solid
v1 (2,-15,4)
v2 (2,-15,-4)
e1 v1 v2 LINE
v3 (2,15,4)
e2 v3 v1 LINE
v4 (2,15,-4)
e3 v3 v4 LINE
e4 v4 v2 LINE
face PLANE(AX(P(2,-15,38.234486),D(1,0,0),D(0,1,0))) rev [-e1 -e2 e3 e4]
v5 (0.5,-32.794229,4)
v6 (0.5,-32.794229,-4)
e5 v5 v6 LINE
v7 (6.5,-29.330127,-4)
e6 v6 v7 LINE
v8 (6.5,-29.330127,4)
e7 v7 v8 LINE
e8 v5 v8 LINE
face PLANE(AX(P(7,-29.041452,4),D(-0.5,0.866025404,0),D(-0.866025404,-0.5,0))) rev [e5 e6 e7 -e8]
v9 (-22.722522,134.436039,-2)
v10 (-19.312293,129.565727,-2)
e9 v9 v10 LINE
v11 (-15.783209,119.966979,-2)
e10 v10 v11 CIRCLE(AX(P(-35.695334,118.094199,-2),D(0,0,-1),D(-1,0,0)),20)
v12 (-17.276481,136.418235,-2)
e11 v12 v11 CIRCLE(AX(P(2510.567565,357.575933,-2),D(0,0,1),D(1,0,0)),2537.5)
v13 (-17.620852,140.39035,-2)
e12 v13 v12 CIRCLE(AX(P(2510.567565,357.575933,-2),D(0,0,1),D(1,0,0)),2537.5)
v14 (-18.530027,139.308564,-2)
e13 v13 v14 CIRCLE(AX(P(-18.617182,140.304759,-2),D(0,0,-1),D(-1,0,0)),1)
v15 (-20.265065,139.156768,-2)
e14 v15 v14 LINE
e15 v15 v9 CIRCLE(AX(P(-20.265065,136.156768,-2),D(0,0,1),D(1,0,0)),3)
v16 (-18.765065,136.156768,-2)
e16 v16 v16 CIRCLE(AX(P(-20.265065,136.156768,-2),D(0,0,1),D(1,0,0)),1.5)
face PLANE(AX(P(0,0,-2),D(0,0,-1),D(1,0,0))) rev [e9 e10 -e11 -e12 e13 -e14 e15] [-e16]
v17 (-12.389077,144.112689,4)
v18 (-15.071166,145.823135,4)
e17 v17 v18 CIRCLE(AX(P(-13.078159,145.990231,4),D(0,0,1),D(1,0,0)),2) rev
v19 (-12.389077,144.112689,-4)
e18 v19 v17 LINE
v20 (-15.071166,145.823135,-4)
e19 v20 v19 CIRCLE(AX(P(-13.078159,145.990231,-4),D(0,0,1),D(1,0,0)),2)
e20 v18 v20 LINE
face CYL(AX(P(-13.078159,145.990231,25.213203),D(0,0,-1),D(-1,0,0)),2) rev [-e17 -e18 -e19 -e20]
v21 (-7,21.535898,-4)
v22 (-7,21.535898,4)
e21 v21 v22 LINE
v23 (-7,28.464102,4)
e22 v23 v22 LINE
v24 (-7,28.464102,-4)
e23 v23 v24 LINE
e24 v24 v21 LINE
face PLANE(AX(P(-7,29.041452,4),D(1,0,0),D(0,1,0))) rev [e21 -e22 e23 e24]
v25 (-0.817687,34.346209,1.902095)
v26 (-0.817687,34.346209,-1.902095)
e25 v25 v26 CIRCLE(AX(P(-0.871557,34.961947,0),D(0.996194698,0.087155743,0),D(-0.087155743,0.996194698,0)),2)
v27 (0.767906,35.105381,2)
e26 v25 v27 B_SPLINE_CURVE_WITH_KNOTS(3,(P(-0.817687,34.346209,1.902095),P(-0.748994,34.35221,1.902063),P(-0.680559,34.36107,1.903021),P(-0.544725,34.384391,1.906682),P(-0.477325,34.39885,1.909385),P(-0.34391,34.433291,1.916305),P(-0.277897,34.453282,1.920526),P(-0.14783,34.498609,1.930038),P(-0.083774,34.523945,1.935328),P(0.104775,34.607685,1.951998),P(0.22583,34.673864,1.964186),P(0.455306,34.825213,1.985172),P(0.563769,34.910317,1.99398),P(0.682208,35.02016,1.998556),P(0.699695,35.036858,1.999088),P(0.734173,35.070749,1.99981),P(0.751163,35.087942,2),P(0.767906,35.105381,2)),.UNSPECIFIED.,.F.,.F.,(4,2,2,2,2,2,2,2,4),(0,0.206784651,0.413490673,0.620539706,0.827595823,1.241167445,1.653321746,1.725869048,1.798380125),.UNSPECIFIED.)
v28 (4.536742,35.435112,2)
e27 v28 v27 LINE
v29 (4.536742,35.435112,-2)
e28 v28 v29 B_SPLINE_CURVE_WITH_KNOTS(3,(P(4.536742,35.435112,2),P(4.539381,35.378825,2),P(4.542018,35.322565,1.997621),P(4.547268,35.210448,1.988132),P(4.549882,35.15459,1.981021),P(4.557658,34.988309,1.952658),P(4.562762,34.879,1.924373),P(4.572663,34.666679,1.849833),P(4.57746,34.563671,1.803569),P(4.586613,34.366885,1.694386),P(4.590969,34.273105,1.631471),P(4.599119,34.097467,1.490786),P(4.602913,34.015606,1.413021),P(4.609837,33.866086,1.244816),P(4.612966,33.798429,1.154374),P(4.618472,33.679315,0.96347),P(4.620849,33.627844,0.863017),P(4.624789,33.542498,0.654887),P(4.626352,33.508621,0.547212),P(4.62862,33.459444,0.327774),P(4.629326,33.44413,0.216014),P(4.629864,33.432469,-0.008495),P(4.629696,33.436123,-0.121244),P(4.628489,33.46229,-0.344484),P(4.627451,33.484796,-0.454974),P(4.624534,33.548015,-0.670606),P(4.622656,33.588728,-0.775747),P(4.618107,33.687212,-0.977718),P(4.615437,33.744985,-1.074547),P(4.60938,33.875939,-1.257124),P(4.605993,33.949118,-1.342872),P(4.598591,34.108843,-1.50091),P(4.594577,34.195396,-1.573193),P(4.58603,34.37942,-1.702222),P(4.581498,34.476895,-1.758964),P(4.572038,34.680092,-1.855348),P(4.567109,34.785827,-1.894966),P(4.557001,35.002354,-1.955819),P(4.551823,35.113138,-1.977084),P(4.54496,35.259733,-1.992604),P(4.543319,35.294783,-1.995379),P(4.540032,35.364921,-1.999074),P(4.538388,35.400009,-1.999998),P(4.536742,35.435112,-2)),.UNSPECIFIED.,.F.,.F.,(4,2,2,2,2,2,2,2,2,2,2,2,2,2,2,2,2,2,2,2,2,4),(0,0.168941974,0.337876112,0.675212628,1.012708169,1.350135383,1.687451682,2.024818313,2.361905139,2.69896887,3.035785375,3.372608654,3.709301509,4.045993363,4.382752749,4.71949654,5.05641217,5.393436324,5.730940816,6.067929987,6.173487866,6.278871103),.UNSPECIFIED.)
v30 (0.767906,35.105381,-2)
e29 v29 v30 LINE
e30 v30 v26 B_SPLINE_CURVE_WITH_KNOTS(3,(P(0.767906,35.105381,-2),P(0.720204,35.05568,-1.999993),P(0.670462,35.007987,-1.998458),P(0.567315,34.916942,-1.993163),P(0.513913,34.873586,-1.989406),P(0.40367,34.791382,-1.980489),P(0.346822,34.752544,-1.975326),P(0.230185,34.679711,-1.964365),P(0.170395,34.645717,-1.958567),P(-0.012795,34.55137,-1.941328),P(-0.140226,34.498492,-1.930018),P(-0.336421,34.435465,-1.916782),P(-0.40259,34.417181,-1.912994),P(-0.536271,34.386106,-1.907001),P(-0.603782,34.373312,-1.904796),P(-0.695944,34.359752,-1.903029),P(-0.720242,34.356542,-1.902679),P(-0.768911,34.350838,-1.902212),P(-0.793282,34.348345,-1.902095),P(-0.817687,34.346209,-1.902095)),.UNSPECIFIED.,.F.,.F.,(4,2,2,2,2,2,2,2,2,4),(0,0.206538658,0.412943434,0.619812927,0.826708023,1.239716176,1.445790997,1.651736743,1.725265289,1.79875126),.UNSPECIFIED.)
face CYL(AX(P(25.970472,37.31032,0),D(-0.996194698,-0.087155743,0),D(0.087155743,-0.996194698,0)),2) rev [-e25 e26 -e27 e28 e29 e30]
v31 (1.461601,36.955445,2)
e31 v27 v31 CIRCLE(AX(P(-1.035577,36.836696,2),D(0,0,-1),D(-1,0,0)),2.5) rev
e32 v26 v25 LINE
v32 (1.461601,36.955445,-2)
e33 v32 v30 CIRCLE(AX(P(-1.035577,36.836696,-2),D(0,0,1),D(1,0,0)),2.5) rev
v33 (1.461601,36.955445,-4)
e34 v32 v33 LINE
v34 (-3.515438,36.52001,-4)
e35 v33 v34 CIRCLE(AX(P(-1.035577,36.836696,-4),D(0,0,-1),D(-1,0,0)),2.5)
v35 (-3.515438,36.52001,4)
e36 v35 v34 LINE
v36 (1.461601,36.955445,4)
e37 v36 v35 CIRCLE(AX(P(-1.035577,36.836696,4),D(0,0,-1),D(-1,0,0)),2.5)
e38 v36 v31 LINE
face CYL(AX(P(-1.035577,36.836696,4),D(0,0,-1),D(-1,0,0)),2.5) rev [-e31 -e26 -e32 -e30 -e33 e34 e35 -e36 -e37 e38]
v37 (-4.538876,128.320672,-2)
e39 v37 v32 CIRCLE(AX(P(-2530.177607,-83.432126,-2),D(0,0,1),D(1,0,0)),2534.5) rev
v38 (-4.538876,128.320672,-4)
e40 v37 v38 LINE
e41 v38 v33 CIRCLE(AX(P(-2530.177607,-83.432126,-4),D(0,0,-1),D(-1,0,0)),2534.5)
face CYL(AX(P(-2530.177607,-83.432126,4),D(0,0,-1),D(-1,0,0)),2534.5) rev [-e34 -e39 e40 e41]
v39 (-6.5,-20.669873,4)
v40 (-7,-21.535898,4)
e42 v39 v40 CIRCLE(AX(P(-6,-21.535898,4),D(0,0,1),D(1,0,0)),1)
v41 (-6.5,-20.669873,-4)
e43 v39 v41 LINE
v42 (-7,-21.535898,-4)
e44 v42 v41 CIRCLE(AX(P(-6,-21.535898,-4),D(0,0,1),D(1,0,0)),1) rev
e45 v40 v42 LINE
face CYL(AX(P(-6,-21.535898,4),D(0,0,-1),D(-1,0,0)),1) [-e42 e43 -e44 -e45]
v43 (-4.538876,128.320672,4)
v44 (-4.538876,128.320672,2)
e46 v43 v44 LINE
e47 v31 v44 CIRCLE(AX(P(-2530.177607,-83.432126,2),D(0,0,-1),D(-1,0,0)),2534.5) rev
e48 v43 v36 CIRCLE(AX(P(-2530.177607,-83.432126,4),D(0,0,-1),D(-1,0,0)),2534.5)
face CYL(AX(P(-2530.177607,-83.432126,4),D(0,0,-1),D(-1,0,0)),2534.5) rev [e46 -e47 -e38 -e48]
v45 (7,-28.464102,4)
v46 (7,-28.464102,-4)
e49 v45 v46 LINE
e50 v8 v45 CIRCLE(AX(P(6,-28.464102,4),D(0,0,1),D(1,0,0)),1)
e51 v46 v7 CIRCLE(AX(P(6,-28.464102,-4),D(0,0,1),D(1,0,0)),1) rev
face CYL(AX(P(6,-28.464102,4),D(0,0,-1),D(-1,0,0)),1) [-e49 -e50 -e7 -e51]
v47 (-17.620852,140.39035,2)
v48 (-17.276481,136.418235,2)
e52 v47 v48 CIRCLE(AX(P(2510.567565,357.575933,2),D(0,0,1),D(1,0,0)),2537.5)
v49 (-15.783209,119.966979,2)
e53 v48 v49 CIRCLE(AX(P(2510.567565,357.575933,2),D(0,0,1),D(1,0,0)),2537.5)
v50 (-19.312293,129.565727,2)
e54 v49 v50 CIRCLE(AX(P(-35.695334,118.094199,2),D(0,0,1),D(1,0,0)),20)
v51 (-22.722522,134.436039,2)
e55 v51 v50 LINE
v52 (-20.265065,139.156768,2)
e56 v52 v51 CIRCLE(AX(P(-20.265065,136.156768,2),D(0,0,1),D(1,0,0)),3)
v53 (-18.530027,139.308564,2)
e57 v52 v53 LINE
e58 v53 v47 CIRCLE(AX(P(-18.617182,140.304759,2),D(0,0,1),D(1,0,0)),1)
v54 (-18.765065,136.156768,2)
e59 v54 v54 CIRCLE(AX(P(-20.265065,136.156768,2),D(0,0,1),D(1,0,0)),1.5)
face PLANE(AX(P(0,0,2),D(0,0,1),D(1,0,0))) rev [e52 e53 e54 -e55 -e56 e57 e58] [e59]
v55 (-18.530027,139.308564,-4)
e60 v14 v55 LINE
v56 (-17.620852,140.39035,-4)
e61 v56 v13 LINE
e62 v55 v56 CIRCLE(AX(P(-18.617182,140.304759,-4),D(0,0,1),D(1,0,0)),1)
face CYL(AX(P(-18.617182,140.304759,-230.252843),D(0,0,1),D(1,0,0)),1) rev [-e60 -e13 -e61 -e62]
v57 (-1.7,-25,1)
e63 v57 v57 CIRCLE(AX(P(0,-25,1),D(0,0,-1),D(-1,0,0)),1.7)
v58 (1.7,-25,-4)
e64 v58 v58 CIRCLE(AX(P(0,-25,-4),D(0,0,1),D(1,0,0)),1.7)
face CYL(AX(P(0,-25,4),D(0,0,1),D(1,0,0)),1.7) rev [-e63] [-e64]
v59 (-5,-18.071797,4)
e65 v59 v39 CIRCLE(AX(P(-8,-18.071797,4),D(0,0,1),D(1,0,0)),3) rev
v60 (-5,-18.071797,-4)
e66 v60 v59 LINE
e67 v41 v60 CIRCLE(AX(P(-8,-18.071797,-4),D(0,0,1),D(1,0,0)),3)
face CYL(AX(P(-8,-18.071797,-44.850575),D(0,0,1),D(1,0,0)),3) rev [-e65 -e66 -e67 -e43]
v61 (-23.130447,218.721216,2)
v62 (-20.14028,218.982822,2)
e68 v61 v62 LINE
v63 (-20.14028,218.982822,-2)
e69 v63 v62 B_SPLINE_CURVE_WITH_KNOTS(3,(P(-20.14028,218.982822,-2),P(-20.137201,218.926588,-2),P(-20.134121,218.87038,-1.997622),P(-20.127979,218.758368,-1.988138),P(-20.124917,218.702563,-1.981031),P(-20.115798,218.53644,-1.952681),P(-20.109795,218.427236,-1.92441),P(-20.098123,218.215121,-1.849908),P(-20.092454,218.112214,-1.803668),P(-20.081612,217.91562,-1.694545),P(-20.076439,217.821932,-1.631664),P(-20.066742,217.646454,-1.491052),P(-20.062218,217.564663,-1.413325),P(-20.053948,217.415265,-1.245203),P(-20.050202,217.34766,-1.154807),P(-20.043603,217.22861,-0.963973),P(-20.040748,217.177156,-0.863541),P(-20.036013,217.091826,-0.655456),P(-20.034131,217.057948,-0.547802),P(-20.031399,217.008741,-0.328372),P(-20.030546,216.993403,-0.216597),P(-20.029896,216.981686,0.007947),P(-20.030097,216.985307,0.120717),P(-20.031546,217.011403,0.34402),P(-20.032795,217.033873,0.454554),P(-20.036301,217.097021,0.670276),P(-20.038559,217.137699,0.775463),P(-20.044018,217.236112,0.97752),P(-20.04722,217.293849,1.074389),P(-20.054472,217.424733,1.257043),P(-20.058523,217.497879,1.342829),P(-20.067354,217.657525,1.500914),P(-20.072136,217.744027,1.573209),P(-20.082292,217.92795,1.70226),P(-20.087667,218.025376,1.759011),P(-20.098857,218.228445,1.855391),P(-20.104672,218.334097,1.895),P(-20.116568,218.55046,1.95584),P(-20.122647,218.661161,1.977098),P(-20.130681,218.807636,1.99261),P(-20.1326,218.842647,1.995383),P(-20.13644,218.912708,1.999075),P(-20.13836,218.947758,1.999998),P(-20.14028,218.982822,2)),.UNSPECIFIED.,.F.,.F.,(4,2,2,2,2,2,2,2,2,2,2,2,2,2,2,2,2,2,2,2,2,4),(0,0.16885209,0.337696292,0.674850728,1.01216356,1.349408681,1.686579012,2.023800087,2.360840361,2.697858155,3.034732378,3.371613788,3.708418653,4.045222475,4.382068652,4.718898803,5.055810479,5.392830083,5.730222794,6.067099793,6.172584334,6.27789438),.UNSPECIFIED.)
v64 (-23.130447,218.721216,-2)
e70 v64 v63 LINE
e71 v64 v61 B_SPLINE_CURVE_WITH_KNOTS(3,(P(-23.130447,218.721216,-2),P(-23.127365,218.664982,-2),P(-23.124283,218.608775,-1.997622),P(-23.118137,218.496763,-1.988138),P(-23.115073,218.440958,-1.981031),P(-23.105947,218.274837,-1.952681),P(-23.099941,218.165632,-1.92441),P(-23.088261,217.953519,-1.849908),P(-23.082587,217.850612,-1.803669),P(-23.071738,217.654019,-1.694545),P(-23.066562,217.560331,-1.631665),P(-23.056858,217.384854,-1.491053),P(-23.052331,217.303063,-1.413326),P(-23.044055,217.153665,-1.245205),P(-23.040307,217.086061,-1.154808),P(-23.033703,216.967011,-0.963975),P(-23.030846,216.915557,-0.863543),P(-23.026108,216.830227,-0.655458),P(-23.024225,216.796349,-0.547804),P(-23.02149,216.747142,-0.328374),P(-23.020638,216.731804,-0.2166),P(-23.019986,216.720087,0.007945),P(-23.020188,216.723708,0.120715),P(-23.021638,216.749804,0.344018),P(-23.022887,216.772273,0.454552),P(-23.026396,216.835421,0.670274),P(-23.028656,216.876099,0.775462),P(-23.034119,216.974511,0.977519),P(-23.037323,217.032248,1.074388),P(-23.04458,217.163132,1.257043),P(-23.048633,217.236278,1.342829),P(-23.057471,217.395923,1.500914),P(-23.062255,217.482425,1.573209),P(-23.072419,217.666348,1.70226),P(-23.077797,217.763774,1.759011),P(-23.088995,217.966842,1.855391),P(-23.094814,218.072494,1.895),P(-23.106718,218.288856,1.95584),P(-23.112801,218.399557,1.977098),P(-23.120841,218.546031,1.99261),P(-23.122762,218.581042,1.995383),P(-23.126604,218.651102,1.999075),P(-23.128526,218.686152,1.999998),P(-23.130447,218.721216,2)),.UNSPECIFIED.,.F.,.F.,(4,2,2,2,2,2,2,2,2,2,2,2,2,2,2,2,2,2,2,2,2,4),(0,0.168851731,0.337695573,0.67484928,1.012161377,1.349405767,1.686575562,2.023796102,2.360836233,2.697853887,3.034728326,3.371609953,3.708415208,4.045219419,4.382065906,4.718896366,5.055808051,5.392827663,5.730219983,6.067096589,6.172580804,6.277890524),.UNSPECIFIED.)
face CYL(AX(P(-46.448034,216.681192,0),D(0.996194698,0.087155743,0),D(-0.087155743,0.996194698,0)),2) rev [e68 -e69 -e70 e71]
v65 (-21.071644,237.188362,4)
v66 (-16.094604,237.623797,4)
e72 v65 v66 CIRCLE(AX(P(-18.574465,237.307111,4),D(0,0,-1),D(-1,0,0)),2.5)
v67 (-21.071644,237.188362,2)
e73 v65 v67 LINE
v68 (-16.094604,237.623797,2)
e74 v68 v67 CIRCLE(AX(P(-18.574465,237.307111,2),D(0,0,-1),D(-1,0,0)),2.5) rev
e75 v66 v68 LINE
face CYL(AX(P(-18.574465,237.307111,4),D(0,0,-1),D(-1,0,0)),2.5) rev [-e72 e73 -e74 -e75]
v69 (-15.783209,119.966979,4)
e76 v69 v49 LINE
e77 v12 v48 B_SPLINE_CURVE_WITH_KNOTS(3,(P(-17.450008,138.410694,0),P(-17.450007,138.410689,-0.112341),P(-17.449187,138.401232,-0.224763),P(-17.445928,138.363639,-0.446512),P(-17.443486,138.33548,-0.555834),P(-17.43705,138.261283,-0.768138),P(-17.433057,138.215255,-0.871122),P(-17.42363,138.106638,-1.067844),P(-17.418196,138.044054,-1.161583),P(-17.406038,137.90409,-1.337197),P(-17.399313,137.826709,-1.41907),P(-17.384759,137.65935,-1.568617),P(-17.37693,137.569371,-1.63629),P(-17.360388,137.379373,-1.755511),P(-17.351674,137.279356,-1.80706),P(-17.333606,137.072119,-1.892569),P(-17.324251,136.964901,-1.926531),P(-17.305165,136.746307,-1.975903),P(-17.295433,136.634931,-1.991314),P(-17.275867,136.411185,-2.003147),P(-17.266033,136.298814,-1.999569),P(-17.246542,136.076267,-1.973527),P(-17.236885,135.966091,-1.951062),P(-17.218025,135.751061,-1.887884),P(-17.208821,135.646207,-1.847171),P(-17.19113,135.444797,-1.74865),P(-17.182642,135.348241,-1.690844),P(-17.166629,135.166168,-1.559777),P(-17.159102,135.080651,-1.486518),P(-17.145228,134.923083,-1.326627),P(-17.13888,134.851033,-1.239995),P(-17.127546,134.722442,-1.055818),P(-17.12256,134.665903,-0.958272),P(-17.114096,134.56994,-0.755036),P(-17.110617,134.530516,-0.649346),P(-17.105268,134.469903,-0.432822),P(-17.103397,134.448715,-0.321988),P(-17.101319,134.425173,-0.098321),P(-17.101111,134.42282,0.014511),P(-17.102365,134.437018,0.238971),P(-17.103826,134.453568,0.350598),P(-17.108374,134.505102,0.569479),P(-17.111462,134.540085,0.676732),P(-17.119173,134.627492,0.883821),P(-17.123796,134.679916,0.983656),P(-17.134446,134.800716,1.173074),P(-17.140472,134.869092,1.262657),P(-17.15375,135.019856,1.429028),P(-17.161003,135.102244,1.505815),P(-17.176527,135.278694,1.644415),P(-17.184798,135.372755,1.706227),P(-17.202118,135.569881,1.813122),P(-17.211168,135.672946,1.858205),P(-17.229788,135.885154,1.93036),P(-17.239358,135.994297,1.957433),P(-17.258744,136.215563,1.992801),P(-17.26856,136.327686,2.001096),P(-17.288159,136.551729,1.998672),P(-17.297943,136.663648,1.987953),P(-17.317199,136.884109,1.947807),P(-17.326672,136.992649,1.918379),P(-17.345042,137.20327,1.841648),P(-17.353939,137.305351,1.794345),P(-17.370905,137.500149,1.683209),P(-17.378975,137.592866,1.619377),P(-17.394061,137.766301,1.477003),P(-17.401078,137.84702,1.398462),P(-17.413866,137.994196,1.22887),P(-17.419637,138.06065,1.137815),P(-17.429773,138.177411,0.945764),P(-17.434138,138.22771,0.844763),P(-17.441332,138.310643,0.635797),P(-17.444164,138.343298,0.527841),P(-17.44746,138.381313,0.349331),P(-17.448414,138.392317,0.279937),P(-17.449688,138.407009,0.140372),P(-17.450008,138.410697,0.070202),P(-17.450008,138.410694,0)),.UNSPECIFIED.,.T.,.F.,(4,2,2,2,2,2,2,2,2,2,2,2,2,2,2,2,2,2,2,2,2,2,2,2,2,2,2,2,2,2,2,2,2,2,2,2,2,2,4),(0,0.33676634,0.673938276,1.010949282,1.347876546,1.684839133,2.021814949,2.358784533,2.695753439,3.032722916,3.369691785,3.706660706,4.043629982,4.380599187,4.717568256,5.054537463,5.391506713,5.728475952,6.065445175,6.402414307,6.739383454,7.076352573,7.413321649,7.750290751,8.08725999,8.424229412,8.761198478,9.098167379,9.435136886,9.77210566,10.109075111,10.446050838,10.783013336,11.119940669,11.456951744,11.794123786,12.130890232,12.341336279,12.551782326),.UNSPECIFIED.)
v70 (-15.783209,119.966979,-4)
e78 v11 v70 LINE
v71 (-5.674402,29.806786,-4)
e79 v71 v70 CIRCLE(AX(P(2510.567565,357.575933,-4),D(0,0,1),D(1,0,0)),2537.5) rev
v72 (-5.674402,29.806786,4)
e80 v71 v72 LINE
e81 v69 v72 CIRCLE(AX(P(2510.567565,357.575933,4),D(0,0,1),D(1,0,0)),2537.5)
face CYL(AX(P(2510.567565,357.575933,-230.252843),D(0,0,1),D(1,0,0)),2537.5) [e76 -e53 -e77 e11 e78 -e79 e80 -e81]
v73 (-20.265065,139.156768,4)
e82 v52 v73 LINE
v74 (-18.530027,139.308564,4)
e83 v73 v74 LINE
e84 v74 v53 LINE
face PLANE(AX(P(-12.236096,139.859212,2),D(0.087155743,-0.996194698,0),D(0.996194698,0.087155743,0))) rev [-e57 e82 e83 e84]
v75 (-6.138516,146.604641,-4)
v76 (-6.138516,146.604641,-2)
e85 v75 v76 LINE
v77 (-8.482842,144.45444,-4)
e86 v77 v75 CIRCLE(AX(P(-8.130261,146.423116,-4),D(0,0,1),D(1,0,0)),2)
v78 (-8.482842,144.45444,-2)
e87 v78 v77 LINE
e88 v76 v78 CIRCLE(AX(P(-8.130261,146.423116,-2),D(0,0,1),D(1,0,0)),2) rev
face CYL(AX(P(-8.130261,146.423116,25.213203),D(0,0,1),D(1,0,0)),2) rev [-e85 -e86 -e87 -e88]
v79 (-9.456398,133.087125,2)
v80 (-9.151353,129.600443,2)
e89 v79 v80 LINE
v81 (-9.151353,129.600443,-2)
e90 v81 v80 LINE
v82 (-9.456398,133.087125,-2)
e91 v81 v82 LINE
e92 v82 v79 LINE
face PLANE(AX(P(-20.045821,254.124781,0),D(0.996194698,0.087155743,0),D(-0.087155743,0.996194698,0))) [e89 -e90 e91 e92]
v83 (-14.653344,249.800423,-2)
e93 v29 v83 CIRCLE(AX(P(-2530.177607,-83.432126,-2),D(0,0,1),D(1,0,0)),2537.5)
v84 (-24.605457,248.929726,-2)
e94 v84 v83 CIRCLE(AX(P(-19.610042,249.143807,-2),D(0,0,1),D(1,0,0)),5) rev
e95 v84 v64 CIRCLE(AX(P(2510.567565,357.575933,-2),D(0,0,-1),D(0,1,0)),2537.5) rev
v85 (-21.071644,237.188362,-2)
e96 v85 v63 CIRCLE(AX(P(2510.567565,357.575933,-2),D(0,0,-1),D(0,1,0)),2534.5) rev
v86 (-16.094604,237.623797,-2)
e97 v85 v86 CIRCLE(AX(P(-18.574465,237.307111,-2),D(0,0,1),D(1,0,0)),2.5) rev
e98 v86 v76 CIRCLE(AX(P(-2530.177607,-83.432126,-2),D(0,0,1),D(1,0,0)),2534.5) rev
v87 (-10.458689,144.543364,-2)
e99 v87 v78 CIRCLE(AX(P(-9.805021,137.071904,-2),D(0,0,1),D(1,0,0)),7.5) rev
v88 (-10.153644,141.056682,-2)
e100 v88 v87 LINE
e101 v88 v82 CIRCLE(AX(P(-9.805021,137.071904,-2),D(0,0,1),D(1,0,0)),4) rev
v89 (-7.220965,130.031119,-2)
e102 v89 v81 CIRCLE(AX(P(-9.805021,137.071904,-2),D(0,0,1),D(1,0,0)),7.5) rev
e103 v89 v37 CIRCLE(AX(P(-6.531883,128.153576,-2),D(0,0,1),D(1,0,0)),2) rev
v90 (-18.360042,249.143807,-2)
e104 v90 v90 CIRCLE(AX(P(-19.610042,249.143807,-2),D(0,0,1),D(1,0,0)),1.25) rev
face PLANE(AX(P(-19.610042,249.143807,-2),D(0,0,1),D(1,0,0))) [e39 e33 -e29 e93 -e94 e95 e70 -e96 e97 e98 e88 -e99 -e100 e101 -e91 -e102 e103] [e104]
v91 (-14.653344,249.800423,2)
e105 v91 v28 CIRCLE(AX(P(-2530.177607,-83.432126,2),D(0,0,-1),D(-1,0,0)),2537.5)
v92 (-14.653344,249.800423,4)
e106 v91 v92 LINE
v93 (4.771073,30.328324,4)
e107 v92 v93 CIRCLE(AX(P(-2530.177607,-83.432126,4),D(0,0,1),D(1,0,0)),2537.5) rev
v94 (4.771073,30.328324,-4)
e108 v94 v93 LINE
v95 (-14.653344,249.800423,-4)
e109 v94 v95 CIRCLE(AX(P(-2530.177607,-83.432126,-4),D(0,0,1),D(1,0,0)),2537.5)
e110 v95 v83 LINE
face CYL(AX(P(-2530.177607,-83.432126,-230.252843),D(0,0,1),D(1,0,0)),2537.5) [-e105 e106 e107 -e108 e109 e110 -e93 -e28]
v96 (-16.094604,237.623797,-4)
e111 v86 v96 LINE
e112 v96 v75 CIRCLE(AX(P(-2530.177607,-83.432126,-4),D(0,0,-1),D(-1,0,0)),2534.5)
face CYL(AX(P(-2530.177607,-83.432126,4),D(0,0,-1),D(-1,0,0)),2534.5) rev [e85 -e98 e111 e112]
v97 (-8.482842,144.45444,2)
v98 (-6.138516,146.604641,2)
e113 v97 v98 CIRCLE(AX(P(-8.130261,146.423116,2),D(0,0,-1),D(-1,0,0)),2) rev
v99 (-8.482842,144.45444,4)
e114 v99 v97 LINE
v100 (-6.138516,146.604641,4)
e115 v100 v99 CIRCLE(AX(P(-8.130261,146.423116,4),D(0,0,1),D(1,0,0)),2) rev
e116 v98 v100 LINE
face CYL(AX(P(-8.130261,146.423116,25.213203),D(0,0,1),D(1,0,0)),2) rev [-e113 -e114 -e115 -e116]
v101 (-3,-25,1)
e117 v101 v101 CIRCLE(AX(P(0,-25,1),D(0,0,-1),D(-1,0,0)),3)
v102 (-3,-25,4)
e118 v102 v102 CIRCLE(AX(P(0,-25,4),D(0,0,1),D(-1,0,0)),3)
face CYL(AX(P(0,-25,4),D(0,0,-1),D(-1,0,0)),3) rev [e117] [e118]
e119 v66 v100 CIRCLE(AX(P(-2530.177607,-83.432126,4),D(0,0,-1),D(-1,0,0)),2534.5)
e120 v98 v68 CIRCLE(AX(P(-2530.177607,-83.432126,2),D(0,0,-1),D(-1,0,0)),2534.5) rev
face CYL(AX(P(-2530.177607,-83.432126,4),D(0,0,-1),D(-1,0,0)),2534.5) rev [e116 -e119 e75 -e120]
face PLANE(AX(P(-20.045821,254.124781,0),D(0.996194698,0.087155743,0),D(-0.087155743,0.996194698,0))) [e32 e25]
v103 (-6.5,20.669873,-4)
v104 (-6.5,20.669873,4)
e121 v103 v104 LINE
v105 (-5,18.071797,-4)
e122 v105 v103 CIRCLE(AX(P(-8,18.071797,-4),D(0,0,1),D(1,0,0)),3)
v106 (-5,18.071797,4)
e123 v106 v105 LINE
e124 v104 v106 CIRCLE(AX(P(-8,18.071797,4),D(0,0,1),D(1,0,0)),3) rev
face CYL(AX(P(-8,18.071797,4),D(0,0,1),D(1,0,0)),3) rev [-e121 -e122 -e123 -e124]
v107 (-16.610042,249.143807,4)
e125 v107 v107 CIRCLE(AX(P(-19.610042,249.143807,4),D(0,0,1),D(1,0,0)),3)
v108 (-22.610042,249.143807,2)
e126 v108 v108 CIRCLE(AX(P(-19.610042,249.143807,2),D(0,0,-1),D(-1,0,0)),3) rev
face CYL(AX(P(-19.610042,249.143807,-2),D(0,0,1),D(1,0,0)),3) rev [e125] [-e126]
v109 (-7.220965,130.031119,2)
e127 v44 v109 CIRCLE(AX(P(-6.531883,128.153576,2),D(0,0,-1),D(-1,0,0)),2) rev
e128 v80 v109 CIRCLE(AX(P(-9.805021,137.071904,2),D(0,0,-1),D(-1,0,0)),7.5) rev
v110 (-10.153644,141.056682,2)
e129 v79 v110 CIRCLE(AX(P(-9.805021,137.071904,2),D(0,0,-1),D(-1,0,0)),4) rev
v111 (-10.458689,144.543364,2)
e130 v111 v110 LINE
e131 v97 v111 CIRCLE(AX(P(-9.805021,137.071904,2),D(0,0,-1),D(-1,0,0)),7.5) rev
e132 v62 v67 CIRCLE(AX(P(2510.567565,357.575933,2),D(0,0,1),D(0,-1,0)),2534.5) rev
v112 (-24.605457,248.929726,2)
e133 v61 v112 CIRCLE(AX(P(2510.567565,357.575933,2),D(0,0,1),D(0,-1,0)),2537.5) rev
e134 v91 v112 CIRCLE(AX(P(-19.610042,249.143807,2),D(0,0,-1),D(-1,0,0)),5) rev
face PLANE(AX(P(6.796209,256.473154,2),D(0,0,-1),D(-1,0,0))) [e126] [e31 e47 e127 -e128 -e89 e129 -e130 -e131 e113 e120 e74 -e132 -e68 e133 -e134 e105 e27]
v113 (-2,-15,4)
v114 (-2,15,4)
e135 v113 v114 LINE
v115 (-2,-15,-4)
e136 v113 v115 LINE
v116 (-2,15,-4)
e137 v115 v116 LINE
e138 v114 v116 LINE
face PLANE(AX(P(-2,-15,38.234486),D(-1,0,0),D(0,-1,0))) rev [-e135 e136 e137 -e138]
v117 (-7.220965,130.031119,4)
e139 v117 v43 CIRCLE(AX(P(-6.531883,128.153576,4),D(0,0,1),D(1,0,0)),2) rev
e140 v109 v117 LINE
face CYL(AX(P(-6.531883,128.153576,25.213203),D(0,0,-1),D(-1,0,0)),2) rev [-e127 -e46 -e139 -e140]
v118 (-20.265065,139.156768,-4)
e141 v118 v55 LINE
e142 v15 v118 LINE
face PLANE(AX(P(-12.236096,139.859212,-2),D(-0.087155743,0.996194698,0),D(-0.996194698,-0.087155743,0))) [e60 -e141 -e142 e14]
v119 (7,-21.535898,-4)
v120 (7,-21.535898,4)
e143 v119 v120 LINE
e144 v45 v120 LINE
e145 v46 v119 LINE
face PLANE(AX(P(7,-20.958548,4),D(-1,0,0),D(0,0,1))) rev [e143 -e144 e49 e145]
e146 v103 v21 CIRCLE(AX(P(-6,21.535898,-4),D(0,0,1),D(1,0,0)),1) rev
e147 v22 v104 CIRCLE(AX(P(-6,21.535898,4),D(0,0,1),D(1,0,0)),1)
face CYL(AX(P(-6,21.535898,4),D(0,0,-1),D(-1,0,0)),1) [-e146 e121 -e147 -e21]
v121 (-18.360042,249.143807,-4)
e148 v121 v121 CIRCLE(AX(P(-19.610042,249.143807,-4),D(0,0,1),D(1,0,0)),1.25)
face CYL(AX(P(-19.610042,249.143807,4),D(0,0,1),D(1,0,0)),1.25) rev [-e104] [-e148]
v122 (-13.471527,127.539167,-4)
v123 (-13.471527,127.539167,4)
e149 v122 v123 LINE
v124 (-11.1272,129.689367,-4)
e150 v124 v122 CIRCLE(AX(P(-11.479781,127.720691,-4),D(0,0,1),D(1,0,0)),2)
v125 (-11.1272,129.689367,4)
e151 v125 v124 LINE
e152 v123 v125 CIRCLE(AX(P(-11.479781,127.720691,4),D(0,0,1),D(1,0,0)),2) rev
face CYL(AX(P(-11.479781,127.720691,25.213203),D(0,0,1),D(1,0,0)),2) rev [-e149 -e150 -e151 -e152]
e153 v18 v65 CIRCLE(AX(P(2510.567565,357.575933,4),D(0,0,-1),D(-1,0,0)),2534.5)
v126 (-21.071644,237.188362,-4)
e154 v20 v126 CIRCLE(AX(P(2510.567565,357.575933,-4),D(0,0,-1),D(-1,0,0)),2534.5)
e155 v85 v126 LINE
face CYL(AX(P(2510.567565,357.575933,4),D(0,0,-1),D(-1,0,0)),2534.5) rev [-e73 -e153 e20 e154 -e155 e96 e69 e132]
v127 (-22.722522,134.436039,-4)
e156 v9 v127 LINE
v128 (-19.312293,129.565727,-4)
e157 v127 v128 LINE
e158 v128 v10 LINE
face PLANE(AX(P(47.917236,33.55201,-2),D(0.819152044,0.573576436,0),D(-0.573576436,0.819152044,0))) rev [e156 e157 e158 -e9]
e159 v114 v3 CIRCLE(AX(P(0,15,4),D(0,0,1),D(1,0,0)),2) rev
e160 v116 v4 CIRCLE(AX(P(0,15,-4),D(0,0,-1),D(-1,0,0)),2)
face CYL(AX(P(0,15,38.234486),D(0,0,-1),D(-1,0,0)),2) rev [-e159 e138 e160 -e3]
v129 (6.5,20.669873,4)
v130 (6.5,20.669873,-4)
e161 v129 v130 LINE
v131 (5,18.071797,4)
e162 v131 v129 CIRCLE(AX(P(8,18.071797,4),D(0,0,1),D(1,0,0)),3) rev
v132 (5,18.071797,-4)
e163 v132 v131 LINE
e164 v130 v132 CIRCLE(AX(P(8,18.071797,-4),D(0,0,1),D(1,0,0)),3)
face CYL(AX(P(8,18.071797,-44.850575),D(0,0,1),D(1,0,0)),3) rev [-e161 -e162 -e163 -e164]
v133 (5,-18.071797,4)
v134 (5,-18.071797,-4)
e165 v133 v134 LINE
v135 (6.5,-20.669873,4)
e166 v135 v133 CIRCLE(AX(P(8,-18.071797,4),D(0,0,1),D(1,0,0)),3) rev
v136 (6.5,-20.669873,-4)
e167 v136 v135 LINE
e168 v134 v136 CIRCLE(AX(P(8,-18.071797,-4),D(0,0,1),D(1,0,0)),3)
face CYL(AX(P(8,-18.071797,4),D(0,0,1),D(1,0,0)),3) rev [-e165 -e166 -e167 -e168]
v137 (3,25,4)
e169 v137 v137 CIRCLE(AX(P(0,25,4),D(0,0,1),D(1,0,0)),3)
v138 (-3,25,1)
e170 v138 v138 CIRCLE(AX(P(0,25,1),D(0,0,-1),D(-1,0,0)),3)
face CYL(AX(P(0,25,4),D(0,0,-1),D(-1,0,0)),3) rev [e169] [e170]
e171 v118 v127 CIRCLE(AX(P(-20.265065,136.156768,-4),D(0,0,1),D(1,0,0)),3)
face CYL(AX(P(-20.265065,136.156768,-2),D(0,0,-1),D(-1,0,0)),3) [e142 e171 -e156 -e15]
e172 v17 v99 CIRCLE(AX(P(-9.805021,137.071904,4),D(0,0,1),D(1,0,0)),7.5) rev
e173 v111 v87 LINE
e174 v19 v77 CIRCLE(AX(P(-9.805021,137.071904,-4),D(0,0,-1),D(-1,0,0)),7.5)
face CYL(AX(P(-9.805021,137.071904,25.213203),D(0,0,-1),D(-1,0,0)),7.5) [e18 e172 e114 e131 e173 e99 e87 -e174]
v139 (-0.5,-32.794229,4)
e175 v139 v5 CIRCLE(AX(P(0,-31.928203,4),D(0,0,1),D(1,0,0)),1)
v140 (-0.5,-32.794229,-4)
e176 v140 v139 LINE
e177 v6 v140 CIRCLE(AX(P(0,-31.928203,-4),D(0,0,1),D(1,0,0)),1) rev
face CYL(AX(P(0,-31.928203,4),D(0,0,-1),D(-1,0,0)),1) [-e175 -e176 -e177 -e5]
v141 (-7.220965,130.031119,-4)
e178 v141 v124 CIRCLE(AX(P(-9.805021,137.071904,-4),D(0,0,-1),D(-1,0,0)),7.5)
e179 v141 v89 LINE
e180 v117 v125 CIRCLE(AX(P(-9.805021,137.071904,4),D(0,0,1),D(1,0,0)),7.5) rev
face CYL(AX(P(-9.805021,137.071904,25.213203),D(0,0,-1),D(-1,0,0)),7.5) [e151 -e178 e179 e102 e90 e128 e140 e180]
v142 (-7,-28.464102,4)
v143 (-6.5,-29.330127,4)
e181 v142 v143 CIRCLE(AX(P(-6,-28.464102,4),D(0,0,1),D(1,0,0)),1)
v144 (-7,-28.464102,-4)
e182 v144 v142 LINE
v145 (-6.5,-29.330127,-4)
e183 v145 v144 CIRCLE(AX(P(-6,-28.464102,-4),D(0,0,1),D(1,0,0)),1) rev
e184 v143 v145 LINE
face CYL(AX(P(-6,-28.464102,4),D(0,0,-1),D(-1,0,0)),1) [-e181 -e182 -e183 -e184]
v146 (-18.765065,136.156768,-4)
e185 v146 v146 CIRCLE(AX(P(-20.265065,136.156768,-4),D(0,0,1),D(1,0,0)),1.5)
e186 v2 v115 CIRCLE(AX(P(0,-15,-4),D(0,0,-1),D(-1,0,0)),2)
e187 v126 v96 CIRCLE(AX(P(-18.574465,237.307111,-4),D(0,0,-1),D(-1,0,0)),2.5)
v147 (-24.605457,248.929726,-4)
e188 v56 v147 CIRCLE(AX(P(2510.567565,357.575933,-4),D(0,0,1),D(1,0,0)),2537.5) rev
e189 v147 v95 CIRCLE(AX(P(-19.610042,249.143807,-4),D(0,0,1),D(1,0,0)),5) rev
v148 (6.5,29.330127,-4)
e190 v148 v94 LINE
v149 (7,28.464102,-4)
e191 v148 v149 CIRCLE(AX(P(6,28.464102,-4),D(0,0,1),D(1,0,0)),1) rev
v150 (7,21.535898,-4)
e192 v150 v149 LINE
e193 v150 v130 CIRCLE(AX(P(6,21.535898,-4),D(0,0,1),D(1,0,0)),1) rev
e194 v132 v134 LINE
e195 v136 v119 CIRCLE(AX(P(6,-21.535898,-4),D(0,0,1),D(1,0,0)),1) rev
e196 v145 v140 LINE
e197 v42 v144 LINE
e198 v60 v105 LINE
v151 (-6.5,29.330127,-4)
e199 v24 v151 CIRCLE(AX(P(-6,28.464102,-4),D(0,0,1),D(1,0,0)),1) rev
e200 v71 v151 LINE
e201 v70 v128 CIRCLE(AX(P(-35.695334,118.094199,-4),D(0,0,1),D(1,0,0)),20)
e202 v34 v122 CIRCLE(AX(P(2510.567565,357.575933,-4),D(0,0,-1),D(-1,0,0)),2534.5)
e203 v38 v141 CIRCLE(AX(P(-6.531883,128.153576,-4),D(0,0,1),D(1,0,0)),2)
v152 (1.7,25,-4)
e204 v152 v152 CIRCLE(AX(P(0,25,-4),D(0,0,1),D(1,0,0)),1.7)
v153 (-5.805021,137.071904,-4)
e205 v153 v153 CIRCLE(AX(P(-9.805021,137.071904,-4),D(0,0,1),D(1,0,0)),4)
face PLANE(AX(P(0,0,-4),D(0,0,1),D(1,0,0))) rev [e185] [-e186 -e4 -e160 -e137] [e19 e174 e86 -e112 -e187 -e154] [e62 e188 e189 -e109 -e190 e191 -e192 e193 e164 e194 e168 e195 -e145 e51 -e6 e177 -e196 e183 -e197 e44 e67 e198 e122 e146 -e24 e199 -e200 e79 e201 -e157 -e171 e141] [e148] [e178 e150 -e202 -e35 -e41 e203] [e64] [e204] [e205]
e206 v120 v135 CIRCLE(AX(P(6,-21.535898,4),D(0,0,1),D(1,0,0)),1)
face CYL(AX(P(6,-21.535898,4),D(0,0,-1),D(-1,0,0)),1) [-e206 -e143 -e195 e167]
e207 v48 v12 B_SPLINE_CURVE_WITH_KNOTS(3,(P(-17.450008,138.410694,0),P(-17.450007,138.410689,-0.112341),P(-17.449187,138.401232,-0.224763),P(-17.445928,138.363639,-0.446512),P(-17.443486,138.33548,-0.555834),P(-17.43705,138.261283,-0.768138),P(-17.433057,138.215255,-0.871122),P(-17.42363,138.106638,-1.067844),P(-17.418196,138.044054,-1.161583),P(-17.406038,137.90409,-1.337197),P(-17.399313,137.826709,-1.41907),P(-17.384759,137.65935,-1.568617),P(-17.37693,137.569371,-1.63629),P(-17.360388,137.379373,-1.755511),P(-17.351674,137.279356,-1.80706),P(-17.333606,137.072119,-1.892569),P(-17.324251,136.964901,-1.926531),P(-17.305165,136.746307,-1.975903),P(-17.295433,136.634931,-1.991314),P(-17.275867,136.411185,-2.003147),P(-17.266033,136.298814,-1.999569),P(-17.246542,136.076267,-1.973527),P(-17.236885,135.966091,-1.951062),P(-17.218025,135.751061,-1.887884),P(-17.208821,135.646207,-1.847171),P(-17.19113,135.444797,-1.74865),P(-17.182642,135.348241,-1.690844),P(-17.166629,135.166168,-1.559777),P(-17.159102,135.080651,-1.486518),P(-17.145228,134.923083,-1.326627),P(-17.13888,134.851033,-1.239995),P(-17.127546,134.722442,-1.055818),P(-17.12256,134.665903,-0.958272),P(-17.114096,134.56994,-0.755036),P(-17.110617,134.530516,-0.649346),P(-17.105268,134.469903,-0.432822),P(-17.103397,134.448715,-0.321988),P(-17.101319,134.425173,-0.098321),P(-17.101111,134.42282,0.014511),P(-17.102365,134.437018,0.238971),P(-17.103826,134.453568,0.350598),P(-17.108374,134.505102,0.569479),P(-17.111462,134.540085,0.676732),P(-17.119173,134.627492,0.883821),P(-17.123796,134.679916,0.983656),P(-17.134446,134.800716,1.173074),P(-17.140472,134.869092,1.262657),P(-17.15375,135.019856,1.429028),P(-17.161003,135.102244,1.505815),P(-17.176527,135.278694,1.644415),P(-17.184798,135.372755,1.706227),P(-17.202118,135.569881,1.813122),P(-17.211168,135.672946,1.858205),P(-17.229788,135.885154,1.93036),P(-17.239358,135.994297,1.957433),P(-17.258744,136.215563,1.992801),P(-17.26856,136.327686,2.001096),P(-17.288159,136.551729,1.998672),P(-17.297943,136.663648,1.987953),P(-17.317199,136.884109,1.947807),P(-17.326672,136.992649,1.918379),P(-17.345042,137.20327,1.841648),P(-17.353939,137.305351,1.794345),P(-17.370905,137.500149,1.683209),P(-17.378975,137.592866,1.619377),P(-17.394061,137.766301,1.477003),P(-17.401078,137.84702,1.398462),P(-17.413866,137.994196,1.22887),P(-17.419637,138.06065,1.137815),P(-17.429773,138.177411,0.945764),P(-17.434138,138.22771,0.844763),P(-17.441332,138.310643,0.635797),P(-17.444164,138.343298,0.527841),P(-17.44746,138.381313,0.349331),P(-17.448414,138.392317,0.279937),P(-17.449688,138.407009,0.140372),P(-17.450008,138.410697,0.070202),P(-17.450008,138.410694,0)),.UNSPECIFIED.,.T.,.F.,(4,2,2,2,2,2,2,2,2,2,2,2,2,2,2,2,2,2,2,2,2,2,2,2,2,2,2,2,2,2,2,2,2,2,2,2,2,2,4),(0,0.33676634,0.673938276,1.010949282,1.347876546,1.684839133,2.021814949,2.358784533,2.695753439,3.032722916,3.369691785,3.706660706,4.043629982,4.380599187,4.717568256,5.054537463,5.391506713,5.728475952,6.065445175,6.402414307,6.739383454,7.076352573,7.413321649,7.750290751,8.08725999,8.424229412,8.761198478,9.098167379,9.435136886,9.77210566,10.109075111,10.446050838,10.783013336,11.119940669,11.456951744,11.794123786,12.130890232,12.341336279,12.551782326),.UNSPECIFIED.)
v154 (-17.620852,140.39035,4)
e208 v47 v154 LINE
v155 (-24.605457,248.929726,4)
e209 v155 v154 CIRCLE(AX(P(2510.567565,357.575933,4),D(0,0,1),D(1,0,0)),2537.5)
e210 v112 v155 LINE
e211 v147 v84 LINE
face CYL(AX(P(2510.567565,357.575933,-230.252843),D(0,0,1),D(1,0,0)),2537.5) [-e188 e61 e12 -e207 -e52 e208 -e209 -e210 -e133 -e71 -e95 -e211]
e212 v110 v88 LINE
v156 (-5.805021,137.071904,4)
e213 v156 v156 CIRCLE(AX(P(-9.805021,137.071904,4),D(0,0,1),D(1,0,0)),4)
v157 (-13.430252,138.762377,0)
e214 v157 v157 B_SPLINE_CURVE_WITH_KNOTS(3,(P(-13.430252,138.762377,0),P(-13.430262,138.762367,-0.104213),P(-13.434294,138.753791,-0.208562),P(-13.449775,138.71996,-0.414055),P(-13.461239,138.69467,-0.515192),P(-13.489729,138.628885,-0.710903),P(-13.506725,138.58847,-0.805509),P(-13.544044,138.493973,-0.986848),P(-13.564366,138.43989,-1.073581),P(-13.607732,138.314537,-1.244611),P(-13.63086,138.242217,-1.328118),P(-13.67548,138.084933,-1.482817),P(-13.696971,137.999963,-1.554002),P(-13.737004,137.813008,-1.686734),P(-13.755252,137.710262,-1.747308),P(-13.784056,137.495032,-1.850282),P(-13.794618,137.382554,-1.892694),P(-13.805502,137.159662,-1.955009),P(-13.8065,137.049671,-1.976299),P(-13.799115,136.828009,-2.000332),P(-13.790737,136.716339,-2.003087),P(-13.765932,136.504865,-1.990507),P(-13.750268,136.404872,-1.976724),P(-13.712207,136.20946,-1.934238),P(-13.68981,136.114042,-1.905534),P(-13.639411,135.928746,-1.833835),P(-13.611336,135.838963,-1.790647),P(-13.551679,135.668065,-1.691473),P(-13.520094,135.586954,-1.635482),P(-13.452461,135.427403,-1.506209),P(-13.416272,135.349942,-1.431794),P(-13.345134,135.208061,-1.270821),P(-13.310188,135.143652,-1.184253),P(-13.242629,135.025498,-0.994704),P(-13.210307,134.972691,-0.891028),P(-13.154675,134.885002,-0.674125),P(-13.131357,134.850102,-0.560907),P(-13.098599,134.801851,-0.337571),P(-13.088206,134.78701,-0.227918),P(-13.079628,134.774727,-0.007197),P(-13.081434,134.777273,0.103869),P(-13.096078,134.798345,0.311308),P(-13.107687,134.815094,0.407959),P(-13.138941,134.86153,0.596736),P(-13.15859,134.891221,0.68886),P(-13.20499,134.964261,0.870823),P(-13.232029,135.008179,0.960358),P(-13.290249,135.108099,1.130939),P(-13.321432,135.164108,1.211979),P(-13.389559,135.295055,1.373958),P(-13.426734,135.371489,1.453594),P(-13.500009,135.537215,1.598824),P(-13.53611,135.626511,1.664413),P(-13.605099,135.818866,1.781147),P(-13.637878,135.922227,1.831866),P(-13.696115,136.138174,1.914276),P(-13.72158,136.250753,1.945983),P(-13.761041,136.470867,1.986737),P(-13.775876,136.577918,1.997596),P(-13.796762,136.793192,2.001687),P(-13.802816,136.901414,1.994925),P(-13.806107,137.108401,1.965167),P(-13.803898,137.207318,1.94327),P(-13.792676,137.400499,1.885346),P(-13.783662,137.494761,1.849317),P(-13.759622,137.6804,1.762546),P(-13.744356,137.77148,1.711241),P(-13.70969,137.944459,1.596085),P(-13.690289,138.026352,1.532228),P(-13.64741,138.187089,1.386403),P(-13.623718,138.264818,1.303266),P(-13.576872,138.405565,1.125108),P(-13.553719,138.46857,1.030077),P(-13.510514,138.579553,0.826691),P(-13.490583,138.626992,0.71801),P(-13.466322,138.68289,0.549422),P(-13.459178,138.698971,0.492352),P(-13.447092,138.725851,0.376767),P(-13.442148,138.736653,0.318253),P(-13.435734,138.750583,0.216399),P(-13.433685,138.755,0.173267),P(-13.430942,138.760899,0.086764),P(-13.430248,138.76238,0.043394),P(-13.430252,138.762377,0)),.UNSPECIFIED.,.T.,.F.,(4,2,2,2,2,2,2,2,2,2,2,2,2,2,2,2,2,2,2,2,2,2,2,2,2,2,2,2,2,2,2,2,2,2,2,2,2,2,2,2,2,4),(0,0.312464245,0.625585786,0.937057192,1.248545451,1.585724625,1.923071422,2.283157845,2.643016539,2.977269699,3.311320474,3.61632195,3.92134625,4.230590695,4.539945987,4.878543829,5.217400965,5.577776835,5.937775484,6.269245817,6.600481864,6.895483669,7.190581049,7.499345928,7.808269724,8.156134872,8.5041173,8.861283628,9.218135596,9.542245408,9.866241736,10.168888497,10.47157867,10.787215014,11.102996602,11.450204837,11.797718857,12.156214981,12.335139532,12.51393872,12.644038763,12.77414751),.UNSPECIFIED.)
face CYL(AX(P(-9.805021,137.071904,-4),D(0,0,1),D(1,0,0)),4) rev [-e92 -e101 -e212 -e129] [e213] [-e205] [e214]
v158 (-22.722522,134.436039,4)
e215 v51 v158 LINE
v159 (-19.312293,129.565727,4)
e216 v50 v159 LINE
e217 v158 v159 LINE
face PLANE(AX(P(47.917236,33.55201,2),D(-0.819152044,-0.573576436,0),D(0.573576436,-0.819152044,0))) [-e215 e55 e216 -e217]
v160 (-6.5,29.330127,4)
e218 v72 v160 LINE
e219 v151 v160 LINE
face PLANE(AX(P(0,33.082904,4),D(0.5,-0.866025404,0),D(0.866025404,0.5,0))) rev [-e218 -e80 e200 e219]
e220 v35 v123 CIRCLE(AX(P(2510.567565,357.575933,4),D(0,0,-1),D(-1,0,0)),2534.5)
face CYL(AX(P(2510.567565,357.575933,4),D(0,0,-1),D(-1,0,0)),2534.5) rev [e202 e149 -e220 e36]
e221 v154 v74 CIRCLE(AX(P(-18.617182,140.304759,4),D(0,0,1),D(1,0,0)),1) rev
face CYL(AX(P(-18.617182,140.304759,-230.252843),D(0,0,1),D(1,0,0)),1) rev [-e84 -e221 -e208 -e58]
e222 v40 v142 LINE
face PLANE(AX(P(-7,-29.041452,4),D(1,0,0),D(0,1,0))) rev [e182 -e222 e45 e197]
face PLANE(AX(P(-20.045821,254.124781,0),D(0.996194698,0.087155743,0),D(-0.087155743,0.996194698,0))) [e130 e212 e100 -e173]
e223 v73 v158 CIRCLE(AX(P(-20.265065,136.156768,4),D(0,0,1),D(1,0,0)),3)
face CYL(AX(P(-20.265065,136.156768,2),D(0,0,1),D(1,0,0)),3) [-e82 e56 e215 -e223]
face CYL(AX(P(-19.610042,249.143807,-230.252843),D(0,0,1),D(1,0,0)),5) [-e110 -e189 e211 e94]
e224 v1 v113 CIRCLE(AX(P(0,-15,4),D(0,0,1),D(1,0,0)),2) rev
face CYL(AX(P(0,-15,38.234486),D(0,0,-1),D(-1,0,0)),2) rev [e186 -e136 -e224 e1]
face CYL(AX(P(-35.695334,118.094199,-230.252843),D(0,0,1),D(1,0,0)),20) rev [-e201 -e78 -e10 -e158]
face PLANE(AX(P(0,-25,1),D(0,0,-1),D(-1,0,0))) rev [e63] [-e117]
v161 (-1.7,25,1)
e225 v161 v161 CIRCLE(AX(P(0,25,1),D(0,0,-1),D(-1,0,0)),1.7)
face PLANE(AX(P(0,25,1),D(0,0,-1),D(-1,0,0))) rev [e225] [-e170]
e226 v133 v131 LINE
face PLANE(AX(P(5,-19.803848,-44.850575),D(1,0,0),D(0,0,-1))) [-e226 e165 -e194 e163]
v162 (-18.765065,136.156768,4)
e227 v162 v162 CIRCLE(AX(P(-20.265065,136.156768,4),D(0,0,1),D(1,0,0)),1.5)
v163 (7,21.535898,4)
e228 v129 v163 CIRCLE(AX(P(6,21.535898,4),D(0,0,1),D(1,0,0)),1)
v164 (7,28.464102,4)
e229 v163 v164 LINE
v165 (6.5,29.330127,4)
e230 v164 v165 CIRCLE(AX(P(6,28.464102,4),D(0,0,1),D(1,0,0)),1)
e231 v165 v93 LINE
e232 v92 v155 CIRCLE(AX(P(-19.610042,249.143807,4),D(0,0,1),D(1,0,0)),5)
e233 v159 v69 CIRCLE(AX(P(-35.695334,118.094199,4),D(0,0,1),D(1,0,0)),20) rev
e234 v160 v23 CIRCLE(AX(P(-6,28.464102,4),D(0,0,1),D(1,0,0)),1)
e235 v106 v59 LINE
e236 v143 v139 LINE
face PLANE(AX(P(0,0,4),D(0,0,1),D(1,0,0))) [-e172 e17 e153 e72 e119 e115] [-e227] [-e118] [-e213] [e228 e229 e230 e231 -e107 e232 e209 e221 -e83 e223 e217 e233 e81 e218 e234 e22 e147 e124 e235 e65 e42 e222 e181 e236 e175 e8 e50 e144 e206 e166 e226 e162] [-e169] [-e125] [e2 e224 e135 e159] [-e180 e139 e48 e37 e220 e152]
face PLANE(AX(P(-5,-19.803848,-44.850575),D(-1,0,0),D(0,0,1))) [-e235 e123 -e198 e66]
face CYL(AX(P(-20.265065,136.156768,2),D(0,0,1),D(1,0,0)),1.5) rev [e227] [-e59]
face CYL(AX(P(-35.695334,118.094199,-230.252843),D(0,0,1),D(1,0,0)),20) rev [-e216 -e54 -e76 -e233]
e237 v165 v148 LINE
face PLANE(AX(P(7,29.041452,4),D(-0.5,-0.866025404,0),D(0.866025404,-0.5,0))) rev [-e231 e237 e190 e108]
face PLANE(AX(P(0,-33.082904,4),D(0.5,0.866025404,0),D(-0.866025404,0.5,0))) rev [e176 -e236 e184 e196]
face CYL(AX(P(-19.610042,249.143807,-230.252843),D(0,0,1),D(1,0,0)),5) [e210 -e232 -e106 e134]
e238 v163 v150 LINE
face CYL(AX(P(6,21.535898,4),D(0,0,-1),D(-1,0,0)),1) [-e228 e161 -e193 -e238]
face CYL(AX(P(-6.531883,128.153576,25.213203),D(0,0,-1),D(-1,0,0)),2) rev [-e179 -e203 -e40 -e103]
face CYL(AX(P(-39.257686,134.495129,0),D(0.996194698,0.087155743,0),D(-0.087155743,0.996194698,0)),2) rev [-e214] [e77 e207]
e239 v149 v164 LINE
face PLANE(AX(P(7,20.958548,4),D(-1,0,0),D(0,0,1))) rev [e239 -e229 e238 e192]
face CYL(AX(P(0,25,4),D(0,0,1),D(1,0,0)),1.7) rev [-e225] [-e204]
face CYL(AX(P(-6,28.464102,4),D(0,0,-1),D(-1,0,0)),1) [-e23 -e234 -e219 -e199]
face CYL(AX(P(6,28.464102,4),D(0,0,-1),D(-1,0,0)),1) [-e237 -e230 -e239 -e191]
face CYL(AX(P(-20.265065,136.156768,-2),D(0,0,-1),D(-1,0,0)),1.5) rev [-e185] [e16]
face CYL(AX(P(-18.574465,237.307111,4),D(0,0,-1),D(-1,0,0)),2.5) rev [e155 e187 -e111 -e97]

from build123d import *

# Parameters (mm, degrees)
SKETCH_1_R           = 3
EXTRUDE_1_DEPTH      = 4
EXTRUDE_1_2_DEPTH    = 4
SKETCH_2_W           = 10
SKETCH_2_H           = 39.607695154
EXTRUDE_2_DEPTH      = 8
FILLET_1_R           = 3
FILLET_2_R           = 1
CUT_EXTRUDE_1_DEPTH  = 8
SKETCH_8_R           = 3
EXTRUDE_4_DEPTH      = 5
HOLE_WIZARD_M3_1_D   = 3.4
EXTRUDE_5_DEPTH      = 8
HOLE_WIZARD_M3_1_2_D = 2.5
SKETCH_10_R          = 3
CUT_EXTRUDE_2_DEPTH  = 6
CUT_EXTRUDE_3_DEPTH  = 256.457880766
SKETCH_14_R          = 7.5
EXTRUDE_6_DEPTH      = 8
FILLET_3_R           = 2
SKETCH_15_R          = 4
CUT_EXTRUDE_4_DEPTH  = 256.457880878
CUT_EXTRUDE_6_DEPTH  = 256.393399125
CUT_EXTRUDE_9_DEPTH  = 256.393399125
SKETCH_23_R          = 2
CUT_EXTRUDE_10_DEPTH = 256.393399125
SKETCH_24_R          = 3
SKETCH_24_R_2        = 1.5
EXTRUDE_7_DEPTH      = 2
FILLET_4_R           = 20
FILLET_5_R           = 1


with BuildPart() as part:
    # ｽｹｯﾁ1 → ﾎﾞｽ - 押し出し1 (new, symmetric)
    with BuildSketch(Plane.XY):
        Polygon((0, -16.917096231), (7, -20.958548116), (7, -29.041451884), (0, -33.082903769), (-7, -29.041451884), (-7, -20.958548116), align=None)
        with Locations(Location((0, -25, 0), (0, 0, 180))):
            Circle(SKETCH_1_R, mode=Mode.SUBTRACT)
    extrude(amount=EXTRUDE_1_DEPTH, both=True)



with BuildPart() as body_2:
    # ｽｹｯﾁ1 → Extrude 1 2 (new, symmetric)
    with BuildSketch(Plane.XY):
        Polygon((7, 20.958548116), (7, 29.041451884), (0, 33.082903769), (-7, 29.041451884), (-7, 20.958548116), (0, 16.917096231), align=None)
        with Locations((0, 25)):
            Circle(SKETCH_1_R, mode=Mode.SUBTRACT)
    extrude(amount=EXTRUDE_1_2_DEPTH, both=True)


with BuildPart() as part_1:
    add(part.part)

    add(body_2.part)  # ﾎﾞｽ - 押し出し2 merges body 2
    # ｽｹｯﾁ2 → ﾎﾞｽ - 押し出し2 (add)
    with BuildSketch(Plane.XY.offset(4)):
        Rectangle(SKETCH_2_W, SKETCH_2_H)
    extrude(amount=-EXTRUDE_2_DEPTH)

    # ﾌｨﾚｯﾄ1
    fillet_1_edges = [part_1.edges().sort_by_distance(p)[0] for p in [
        (-5, -19.803847577, 0),
        (-5, 19.803847577, 0),
        (5, 19.803847577, 0),
        (5, -19.803847577, 0),
    ]]
    fillet(fillet_1_edges, radius=FILLET_1_R)

    # ﾌｨﾚｯﾄ2
    fillet_2_edges = [part_1.edges().sort_by_distance(p)[0] for p in [
        (-7, 20.958548116, 0),
        (-7, 29.041451884, 0),
        (0, 33.082903769, 0),
        (7, 29.041451884, 0),
        (7, 20.958548116, 0),
        (7, -29.041451884, 0),
        (0, -33.082903769, 0),
        (-7, -29.041451884, 0),
        (-7, -20.958548116, 0),
        (7, -20.958548116, 0),
    ]]
    fillet(fillet_2_edges, radius=FILLET_2_R - 0.0001)  # a hair under: the kernel refuses the full size

    # ｽｹｯﾁ3 → ｶｯﾄ - 押し出し1 (cut)
    with BuildSketch(Plane(origin=(0, 0, -4), x_dir=(-1, 0, 0), z_dir=(0, 0, -1))):
        with BuildLine():
            Line((-2, -15), (-2, 15))
            ThreePointArc((-2, 15), (0, 17), (2, 15))
            Line((2, 15), (2, -15))
            ThreePointArc((2, -15), (0, -17), (-2, -15))
        make_face()
    extrude(amount=-CUT_EXTRUDE_1_DEPTH, mode=Mode.SUBTRACT)

    # ｽｹｯﾁ8 → ﾎﾞｽ - 押し出し4 (add)
    with BuildSketch(Plane(origin=(0, 0, -4), x_dir=(-1, 0, 0), z_dir=(0, 0, -1))):
        with Locations((0, -25)):
            Circle(SKETCH_8_R)
        with Locations((0, 25)):
            Circle(SKETCH_8_R)
    extrude(amount=-EXTRUDE_4_DEPTH)

    # Hole Wizard M3 _1 (through all)
    with Locations(Plane(origin=(0, 0, 4), x_dir=(-1, 0, 0), z_dir=(0, 0, 1))):
        with Locations((0, -25), (0, 25)):
            Hole(HOLE_WIZARD_M3_1_D / 2)

    # ｽｹｯﾁ9 → ﾎﾞｽ - 押し出し5 (add)
    with BuildSketch(Plane.XY.offset(4)):
        with BuildLine():
            ThreePointArc((-24.60545694, 248.929725875), (-17.515120176, 139.163052252), (-5.674401923, 29.806786291))
            Line((-5.674401923, 29.806786291), (-0.5, 32.794228634))
            ThreePointArc((-0.5, 32.794228634), (0, 32.92820323), (0.5, 32.794228634))
            Line((0.5, 32.794228634), (4.77107276, 30.328323626))
            ThreePointArc((4.77107276, 30.328323626), (-2.557928959, 140.275299406), (-14.653344063, 249.80042293))
            ThreePointArc((-14.653344063, 249.80042293), (-20.045820832, 254.124780561), (-24.60545694, 248.929725875))
        make_face()
    extrude(amount=-EXTRUDE_5_DEPTH)

    # Hole Wizard M3 _1 2 (through all)
    with Locations(Plane.XY.offset(4)):
        with Locations((-19.610042118, 249.143807071)):
            Hole(HOLE_WIZARD_M3_1_2_D / 2)

    # ｽｹｯﾁ10 → ｶｯﾄ - 押し出し2 (cut)
    with BuildSketch(Plane.XY.offset(4)):
        with Locations((-19.610042118, 249.143807071)):
            Circle(SKETCH_10_R)
    extrude(amount=-CUT_EXTRUDE_2_DEPTH, mode=Mode.SUBTRACT)

    # ｽｹｯﾁ13 → ｶｯﾄ - 押し出し3 (cut, through all)
    with BuildSketch(Plane(origin=(0, 0, -4), x_dir=(-1, 0, 0), z_dir=(0, 0, -1))):
        with BuildLine():
            ThreePointArc((21.071643562, 237.188362315), (18.792354769, 239.797597896), (16.09460449, 237.623796811))
            ThreePointArc((16.09460449, 237.623796811), (5.322144918, 137.464104378), (-1.461601444, 36.955444756))
            ThreePointArc((-1.461601444, 36.955444756), (0.81768735, 34.346209174), (3.515437629, 36.520010259))
            ThreePointArc((3.515437629, 36.520010259), (14.287897201, 136.679702693), (21.071643562, 237.188362315))
        make_face()
    extrude(amount=-CUT_EXTRUDE_3_DEPTH, mode=Mode.SUBTRACT)

    # ｽｹｯﾁ14 → ﾎﾞｽ - 押し出し6 (add)
    with BuildSketch(Plane(origin=(0, 0, -4), x_dir=(-1, 0, 0), z_dir=(0, 0, -1))):
        with Locations((9.805021059, 137.071903535)):
            Circle(SKETCH_14_R)
    extrude(amount=-EXTRUDE_6_DEPTH)

    # ﾌｨﾚｯﾄ3
    fillet_3_edges = [part_1.edges().sort_by_distance(p)[0] for p in [
        (-13.757410706, 130.697845481, 0),
        (-14.804208592, 142.662800065, 0),
        (-4.805833526, 131.481007005, 0),
        (-5.852631412, 143.445961589, 0),
    ]]
    fillet(fillet_3_edges, radius=FILLET_3_R)

    # ｽｹｯﾁ15 → ｶｯﾄ - 押し出し4 (cut, through all)
    with BuildSketch(Plane.XY.offset(4)):
        with Locations((-9.805021059, 137.071903535)):
            Circle(SKETCH_15_R)
    extrude(amount=-CUT_EXTRUDE_4_DEPTH, mode=Mode.SUBTRACT)

    # ｽｹｯﾁ16 → ｶｯﾄ - 押し出し6 (cut, through all)
    with BuildSketch(Plane(origin=(2.170602221, 0.189903087, 0), x_dir=(0.08715574274765833, -0.9961946980917455, 0), z_dir=(0.9961946980917455, 0.08715574274765833, 0))):
        with BuildLine():
            Line((-254.904867452, 2), (-34.904867452, 2))
            ThreePointArc((-34.904867452, 2), (-32.904867452, 0), (-34.904867452, -2))
            Line((-34.904867452, -2), (-254.904867452, -2))
            ThreePointArc((-254.904867452, -2), (-256.904867452, 0), (-254.904867452, 2))
        make_face()
    extrude(amount=CUT_EXTRUDE_6_DEPTH, mode=Mode.SUBTRACT)

    # ｽｹｯﾁ22 → ｶｯﾄ - 押し出し9 (cut, through all)
    with BuildSketch(Plane(origin=(2.170602221, 0.189903087, 0), x_dir=(0, 0, -1), z_dir=(0.9961946980917457, 0.08715574274765832, 0))):
        with BuildLine():
            Line((2, 254.904867452), (2, 219.904867452))
            ThreePointArc((2, 219.904867452), (0, 217.904867452), (-2, 219.904867452))
            Line((-2, 219.904867452), (-2, 254.904867452))
            ThreePointArc((-2, 254.904867452), (0, 256.904867452), (2, 254.904867452))
        make_face()
    extrude(amount=-CUT_EXTRUDE_9_DEPTH, mode=Mode.SUBTRACT)

    # ｽｹｯﾁ23 → ｶｯﾄ - 押し出し10 (cut, through all)
    with BuildSketch(Plane(origin=(2.170602221, 0.189903087, 0), x_dir=(0, 0, -1), z_dir=(0.9961946980917457, 0.08715574274765835, 0))):
        with Locations(Location((0, 137.404867452, 0), (0, 0, 90))):
            Circle(SKETCH_23_R)
    extrude(amount=-CUT_EXTRUDE_10_DEPTH, mode=Mode.SUBTRACT)

    # ｽｹｯﾁ24 → ﾎﾞｽ - 押し出し7 (add)
    # profile 1 of 3: a face of its own
    with BuildSketch(Plane.XY.offset(4)):
        with Locations((-20.265065389, 136.156768236)):
            Circle(SKETCH_24_R)
        with Locations((-20.265065389, 136.156768236)):
            Circle(SKETCH_24_R_2, mode=Mode.SUBTRACT)
    # profile 2 of 3: a face of its own
    with BuildSketch(Plane.XY.offset(4)):
        with BuildLine():
            ThreePointArc((-17.265065389, 136.156768236), (-19.362947991, 133.295617384), (-22.722521522, 134.436038927))
            Line((-22.722521522, 134.436038927), (-16.272118562, 125.223908797))
            ThreePointArc((-16.272118562, 125.223908797), (-16.780497765, 130.820515846), (-17.276481258, 136.418235046))
            ThreePointArc((-17.276481258, 136.418235046), (-17.267920715, 136.287626188), (-17.265065389, 136.156768236))
        make_face()
    # profile 3 of 3: a face of its own
    with BuildSketch(Plane.XY.offset(4)):
        with BuildLine():
            Line((-17.53520033, 139.395600482), (-20.265065389, 139.156768236))
            ThreePointArc((-20.265065389, 139.156768236), (-18.238294611, 138.368600105), (-17.276481258, 136.418235046))
            ThreePointArc((-17.276481258, 136.418235046), (-17.406279124, 137.906879675), (-17.53520033, 139.395600482))
        make_face()
    extrude_7 = extrude(amount=-EXTRUDE_7_DEPTH)

    # ﾐﾗｰ1: ﾎﾞｽ - 押し出し7 across plane
    add(extrude_7.mirror(Plane.XY))

    # ﾌｨﾚｯﾄ4
    fillet_4_edges = [part_1.edges().sort_by_distance(p)[0] for p in [
        (-16.272118562, 125.223908797, 3),
        (-16.272118562, 125.223908797, -3),
    ]]
    fillet(fillet_4_edges, radius=FILLET_4_R)

    # ﾌｨﾚｯﾄ5
    fillet_5_edges = [part_1.edges().sort_by_distance(p)[0] for p in [
        (-17.53520033, 139.395600482, 3),
        (-17.53520033, 139.395600482, -3),
    ]]
    fillet(fillet_5_edges, radius=FILLET_5_R)


solid = part_1.part
